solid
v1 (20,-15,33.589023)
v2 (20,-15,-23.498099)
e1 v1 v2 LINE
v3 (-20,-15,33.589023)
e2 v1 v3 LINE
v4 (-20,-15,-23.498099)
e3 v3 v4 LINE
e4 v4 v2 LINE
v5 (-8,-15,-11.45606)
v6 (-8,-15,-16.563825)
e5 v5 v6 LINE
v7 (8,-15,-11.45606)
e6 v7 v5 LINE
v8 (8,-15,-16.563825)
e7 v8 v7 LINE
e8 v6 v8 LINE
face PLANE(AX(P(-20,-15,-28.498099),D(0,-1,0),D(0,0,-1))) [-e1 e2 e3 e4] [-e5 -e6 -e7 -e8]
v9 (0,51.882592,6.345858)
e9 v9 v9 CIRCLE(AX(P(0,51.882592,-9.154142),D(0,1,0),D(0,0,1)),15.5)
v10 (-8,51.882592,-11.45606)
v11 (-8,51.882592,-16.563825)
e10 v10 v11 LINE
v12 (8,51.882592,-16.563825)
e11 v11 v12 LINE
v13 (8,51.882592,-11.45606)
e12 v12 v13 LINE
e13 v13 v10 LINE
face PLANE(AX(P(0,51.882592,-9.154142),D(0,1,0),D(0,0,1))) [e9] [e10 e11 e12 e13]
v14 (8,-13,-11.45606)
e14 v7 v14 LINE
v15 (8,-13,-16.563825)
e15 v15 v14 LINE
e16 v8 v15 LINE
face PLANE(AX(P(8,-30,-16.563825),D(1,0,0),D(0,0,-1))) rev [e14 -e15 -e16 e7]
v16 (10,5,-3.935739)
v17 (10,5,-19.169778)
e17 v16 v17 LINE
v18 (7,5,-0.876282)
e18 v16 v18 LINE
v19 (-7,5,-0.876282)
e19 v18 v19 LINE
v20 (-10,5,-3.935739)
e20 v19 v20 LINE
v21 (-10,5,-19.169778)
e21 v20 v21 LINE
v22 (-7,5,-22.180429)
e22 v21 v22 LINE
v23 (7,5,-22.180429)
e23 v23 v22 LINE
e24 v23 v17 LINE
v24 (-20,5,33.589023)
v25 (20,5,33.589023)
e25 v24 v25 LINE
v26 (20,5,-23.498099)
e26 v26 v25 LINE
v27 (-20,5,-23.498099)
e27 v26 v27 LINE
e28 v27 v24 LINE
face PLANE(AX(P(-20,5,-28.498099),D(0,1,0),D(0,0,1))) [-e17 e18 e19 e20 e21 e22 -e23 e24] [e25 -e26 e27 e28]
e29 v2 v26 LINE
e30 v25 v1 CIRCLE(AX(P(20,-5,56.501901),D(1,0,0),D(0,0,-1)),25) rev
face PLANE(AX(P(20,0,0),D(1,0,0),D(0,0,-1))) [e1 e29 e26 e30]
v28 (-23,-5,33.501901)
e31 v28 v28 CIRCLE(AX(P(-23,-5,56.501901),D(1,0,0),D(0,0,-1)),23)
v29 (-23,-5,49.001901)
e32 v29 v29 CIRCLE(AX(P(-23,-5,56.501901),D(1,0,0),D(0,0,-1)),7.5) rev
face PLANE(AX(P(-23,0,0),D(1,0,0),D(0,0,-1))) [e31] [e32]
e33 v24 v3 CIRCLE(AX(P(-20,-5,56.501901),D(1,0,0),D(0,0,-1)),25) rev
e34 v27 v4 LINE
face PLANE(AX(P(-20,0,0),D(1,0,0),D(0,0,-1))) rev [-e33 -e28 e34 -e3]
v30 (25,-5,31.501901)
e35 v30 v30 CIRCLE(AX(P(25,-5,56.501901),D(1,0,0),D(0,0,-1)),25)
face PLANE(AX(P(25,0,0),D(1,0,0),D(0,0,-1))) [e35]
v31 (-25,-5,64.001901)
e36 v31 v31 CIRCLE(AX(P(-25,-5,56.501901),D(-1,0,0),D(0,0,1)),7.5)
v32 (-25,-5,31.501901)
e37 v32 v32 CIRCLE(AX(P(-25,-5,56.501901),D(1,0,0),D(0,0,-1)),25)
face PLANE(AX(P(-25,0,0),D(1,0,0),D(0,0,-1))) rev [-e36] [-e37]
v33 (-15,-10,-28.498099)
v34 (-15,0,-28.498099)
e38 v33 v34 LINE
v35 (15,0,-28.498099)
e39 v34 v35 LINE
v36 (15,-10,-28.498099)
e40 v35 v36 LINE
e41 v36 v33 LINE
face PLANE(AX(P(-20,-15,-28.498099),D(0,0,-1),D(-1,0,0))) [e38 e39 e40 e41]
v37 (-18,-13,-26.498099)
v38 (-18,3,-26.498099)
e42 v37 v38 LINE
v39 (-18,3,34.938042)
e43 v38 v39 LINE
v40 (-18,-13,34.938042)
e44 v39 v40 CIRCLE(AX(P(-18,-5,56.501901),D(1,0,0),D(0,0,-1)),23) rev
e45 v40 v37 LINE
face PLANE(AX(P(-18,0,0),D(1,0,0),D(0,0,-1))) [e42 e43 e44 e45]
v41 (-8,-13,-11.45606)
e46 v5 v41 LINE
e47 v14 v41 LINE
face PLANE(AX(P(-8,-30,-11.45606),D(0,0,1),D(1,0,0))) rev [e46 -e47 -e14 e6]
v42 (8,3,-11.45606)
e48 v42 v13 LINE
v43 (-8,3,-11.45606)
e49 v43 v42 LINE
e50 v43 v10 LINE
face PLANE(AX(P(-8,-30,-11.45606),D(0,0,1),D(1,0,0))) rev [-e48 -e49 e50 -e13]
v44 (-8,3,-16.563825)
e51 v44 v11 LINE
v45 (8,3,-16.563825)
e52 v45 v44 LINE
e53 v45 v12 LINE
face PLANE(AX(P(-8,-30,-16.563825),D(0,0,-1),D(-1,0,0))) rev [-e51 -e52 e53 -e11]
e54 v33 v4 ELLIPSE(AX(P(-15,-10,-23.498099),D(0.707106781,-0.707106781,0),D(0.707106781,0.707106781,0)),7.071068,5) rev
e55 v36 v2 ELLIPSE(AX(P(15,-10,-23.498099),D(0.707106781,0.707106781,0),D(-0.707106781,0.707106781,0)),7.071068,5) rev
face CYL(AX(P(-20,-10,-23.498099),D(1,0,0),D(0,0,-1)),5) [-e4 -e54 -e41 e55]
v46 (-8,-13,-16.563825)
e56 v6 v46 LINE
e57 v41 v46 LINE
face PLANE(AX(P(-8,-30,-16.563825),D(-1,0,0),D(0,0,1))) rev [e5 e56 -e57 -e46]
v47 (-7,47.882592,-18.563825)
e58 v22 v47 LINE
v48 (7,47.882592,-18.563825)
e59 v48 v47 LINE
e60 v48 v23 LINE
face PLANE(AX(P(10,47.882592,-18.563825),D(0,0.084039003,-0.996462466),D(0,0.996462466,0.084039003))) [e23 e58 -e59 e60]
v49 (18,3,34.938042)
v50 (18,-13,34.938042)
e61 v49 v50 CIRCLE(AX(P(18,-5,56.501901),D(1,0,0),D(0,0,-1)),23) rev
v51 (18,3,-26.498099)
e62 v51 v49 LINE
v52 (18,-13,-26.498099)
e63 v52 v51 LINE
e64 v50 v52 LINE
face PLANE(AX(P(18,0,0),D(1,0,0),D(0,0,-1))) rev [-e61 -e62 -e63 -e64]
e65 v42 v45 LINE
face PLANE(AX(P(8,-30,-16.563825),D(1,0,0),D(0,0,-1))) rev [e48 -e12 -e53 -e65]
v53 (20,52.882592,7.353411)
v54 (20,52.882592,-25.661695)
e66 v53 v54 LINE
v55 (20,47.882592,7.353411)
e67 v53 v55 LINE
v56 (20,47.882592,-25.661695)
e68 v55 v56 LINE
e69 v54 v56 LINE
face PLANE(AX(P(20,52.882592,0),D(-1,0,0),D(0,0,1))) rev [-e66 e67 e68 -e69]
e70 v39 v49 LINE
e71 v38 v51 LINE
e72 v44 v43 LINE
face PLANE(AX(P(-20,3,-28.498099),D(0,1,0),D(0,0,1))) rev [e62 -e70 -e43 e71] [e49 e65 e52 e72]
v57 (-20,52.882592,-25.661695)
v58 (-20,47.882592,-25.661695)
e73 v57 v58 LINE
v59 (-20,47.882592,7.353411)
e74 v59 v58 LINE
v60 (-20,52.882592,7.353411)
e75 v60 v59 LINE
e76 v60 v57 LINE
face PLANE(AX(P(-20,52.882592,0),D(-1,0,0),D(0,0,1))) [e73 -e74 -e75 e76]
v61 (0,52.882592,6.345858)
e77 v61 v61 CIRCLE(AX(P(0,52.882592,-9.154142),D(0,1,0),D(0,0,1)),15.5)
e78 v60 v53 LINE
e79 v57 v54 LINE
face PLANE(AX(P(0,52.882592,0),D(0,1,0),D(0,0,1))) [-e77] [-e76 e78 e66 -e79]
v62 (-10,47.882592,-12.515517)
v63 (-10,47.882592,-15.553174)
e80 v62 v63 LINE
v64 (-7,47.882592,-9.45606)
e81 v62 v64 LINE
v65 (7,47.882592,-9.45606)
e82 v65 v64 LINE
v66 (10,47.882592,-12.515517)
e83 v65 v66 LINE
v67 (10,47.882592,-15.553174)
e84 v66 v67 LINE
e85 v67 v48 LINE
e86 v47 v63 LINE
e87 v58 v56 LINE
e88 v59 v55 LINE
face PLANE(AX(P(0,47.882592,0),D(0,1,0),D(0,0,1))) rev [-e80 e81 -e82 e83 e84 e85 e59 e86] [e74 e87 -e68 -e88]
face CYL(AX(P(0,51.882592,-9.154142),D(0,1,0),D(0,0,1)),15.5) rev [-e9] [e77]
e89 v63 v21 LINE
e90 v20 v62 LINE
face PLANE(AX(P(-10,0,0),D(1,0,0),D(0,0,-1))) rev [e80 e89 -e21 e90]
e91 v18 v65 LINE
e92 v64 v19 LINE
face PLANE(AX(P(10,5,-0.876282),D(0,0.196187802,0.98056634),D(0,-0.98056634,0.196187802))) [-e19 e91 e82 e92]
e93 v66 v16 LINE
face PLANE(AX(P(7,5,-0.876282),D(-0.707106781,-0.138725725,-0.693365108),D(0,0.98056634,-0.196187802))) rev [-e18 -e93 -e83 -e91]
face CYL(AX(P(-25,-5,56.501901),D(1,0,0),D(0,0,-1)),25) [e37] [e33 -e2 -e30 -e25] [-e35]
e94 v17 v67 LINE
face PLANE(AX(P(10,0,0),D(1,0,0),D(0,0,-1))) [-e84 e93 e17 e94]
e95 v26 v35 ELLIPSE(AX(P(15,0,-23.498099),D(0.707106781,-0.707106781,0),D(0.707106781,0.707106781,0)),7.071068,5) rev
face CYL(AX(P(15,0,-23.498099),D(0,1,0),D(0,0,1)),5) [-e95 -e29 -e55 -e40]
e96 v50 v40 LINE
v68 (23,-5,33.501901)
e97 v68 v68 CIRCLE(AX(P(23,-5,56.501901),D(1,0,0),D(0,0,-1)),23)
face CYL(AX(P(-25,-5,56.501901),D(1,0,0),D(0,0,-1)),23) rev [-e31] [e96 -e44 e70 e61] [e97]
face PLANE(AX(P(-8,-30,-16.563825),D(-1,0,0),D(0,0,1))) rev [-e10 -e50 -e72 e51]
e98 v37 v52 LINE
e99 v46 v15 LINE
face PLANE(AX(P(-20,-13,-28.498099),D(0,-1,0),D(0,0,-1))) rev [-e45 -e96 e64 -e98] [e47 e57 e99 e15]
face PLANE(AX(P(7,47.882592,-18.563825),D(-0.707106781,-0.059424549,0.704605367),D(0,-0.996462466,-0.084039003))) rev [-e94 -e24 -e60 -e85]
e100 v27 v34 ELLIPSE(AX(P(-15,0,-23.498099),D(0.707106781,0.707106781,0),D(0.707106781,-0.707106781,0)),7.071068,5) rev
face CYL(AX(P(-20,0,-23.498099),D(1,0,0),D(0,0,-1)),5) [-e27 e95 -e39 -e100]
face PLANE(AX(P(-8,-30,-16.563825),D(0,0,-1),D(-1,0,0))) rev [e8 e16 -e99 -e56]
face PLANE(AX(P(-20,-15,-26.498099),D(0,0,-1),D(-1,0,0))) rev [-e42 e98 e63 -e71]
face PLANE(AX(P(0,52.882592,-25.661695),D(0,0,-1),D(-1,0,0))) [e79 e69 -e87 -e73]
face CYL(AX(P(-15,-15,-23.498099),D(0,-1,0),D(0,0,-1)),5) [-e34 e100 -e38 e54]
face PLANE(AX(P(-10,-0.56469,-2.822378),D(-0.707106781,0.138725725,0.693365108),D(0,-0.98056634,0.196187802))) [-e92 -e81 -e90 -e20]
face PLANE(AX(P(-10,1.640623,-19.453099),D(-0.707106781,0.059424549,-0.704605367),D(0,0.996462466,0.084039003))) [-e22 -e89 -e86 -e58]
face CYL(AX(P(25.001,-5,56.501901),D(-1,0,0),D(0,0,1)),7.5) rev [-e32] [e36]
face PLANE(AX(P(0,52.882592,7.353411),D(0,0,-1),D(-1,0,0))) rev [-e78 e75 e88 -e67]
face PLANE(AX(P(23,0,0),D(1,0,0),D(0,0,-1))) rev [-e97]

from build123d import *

# Parameters (mm, degrees)
BOSS_EXTRUDE1_DEPTH      = 25
BOSS_EXTRUDE1_DEPTH_BACK = 25
SKETCH1_R                = 25
BOSS_EXTRUDE4_DEPTH      = 20
BOSS_EXTRUDE4_DEPTH_BACK = 20
SKETCH9_W                = 85
SKETCH9_H                = 20
SHELL3_START             = -18
SHELL3_DEPTH             = 36
SHELL3_START_2           = -23
SHELL3_2_OUTLINE_R       = 23
SHELL3_2_DEPTH           = 46
FILLET2_R                = 5
BOSS_EXTRUDE5_DEPTH      = 10
BOSS_EXTRUDE5_DEPTH_BACK = 10
SKETCH5_W                = 40
SKETCH5_H                = 33.01510515
BOSS_EXTRUDE3_DEPTH      = 5
CUT_EXTRUDE2_REACH       = 111.266
SKETCH8_R                = 7.5
SKETCH12_W               = 16
SKETCH12_H               = 5.10776434
CUT_EXTRUDE3_DEPTH       = 119.899470043
CHAMFER2_SIZE            = 3
SKETCH13_R               = 15.5
CUT_EXTRUDE4_DEPTH       = 1


# Read off the part's stored shape, not the designer's step: Shell3
with BuildPart() as part:
    # Sketch1 → Boss-Extrude1 (new, two sides: drawn at the far end of the back side and taken through both)
    with BuildSketch(Plane(origin=(0, 0, 0), x_dir=(0, 0, -1), z_dir=(1, 0, 0)).offset(-BOSS_EXTRUDE1_DEPTH_BACK)):
        with Locations((-56.501901141, -5)):
            Circle(SKETCH1_R)
    extrude(amount=BOSS_EXTRUDE1_DEPTH + BOSS_EXTRUDE1_DEPTH_BACK)

    # Sketch9 → Boss-Extrude4 (add, two sides: drawn at the far end of the back side and taken through both)
    with BuildSketch(Plane(origin=(0, 0, 0), x_dir=(0, 0, -1), z_dir=(1, 0, 0)).offset(-BOSS_EXTRUDE4_DEPTH_BACK)):
        with Locations((-14.001901141, -5)):
            Rectangle(SKETCH9_W, SKETCH9_H)
    extrude(amount=BOSS_EXTRUDE4_DEPTH + BOSS_EXTRUDE4_DEPTH_BACK)

    # Shell3 outline → Shell3 (cut)
    with BuildSketch(Plane.YZ.offset(SHELL3_START)):
        with BuildLine():
            ThreePointArc((3, 34.938042488), (-5, 79.501901141), (-13, 34.938042488))
            Line((-13, 34.938042488), (-13, -26.498098859))
            Line((-13, -26.498098859), (3, -26.498098859))
            Line((3, -26.498098859), (3, 34.938042488))
        make_face()
    extrude(amount=SHELL3_DEPTH, mode=Mode.SUBTRACT)

    # Shell3 2 outline → Shell3 2 (cut)
    with BuildSketch(Plane.YZ.offset(SHELL3_START_2)):
        with Locations((-5, 56.501901141)):
            Circle(SHELL3_2_OUTLINE_R)
    extrude(amount=SHELL3_2_DEPTH, mode=Mode.SUBTRACT)

    # Fillet2
    fillet2_edges = [part.edges().sort_by_distance(p)[0] for p in [
        (0, 5, -28.498098859),
        (-20, -5, -28.498098859),
        (0, -15, -28.498098859),
        (20, -5, -28.498098859),
    ]]
    fillet(fillet2_edges, radius=FILLET2_R)

    # Sketch11 → Boss-Extrude5 (add, two sides: drawn at the far end of the back side and taken through both)
    with BuildSketch(Plane.ZY.offset(-BOSS_EXTRUDE5_DEPTH_BACK)):
        Polygon((-0.876282257, 5), (-9.456060259, 47.882592183), (-18.563824599, 47.882592183), (-22.259728969, 4.059726083), align=None)
    extrude(amount=BOSS_EXTRUDE5_DEPTH + BOSS_EXTRUDE5_DEPTH_BACK)

    # Sketch5 → Boss-Extrude3 (add)
    with BuildSketch(Plane(origin=(0, 47.882592183, 0), x_dir=(1, 0, 0), z_dir=(0, 1, 0))):
        with Locations((0, 9.154141988)):
            Rectangle(SKETCH5_W, SKETCH5_H)
    extrude(amount=BOSS_EXTRUDE3_DEPTH)

    # Sketch8 → Cut-Extrude2 (cut, up to next)
    with BuildSketch(Plane.ZY.offset(25), mode=Mode.PRIVATE) as cut_extrude2_sk1:
        with Locations((56.501901141, -5)):
            Circle(SKETCH8_R)
    cut_extrude2_tool1 = extrude(cut_extrude2_sk1.sketch, amount=-CUT_EXTRUDE2_REACH, mode=Mode.PRIVATE) & part.part
    add(cut_extrude2_tool1.solids().sort_by_distance((-25, -5, 56.501901))[0], mode=Mode.SUBTRACT)

    # Sketch12 → Cut-Extrude3 (cut, through all)
    with BuildSketch(Plane(origin=(0, 52.882592183, 0), x_dir=(1, 0, 0), z_dir=(0, 1, 0))):
        with Locations((0, 14.009942429)):
            Rectangle(SKETCH12_W, SKETCH12_H)
    extrude(amount=-CUT_EXTRUDE3_DEPTH, mode=Mode.SUBTRACT)

    # Chamfer2
    chamfer2_edges = [part.edges().sort_by_distance(p)[0] for p in [
        (10, 26.441296092, -20.372126679),
        (10, 26.441296092, -5.166171258),
        (-10, 26.441296092, -5.166171258),
        (-10, 26.441296092, -20.372126679),
    ]]
    chamfer(chamfer2_edges, length=CHAMFER2_SIZE)

    # Sketch13 → Cut-Extrude4 (cut)
    with BuildSketch(Plane(origin=(0, 52.882592183, 0), x_dir=(1, 0, 0), z_dir=(0, 1, 0))):
        with Locations(Location((0, 9.154141988, 0), (0, 0, 270))):
            Circle(SKETCH13_R)
    extrude(amount=-CUT_EXTRUDE4_DEPTH, mode=Mode.SUBTRACT)


solid = part.part
